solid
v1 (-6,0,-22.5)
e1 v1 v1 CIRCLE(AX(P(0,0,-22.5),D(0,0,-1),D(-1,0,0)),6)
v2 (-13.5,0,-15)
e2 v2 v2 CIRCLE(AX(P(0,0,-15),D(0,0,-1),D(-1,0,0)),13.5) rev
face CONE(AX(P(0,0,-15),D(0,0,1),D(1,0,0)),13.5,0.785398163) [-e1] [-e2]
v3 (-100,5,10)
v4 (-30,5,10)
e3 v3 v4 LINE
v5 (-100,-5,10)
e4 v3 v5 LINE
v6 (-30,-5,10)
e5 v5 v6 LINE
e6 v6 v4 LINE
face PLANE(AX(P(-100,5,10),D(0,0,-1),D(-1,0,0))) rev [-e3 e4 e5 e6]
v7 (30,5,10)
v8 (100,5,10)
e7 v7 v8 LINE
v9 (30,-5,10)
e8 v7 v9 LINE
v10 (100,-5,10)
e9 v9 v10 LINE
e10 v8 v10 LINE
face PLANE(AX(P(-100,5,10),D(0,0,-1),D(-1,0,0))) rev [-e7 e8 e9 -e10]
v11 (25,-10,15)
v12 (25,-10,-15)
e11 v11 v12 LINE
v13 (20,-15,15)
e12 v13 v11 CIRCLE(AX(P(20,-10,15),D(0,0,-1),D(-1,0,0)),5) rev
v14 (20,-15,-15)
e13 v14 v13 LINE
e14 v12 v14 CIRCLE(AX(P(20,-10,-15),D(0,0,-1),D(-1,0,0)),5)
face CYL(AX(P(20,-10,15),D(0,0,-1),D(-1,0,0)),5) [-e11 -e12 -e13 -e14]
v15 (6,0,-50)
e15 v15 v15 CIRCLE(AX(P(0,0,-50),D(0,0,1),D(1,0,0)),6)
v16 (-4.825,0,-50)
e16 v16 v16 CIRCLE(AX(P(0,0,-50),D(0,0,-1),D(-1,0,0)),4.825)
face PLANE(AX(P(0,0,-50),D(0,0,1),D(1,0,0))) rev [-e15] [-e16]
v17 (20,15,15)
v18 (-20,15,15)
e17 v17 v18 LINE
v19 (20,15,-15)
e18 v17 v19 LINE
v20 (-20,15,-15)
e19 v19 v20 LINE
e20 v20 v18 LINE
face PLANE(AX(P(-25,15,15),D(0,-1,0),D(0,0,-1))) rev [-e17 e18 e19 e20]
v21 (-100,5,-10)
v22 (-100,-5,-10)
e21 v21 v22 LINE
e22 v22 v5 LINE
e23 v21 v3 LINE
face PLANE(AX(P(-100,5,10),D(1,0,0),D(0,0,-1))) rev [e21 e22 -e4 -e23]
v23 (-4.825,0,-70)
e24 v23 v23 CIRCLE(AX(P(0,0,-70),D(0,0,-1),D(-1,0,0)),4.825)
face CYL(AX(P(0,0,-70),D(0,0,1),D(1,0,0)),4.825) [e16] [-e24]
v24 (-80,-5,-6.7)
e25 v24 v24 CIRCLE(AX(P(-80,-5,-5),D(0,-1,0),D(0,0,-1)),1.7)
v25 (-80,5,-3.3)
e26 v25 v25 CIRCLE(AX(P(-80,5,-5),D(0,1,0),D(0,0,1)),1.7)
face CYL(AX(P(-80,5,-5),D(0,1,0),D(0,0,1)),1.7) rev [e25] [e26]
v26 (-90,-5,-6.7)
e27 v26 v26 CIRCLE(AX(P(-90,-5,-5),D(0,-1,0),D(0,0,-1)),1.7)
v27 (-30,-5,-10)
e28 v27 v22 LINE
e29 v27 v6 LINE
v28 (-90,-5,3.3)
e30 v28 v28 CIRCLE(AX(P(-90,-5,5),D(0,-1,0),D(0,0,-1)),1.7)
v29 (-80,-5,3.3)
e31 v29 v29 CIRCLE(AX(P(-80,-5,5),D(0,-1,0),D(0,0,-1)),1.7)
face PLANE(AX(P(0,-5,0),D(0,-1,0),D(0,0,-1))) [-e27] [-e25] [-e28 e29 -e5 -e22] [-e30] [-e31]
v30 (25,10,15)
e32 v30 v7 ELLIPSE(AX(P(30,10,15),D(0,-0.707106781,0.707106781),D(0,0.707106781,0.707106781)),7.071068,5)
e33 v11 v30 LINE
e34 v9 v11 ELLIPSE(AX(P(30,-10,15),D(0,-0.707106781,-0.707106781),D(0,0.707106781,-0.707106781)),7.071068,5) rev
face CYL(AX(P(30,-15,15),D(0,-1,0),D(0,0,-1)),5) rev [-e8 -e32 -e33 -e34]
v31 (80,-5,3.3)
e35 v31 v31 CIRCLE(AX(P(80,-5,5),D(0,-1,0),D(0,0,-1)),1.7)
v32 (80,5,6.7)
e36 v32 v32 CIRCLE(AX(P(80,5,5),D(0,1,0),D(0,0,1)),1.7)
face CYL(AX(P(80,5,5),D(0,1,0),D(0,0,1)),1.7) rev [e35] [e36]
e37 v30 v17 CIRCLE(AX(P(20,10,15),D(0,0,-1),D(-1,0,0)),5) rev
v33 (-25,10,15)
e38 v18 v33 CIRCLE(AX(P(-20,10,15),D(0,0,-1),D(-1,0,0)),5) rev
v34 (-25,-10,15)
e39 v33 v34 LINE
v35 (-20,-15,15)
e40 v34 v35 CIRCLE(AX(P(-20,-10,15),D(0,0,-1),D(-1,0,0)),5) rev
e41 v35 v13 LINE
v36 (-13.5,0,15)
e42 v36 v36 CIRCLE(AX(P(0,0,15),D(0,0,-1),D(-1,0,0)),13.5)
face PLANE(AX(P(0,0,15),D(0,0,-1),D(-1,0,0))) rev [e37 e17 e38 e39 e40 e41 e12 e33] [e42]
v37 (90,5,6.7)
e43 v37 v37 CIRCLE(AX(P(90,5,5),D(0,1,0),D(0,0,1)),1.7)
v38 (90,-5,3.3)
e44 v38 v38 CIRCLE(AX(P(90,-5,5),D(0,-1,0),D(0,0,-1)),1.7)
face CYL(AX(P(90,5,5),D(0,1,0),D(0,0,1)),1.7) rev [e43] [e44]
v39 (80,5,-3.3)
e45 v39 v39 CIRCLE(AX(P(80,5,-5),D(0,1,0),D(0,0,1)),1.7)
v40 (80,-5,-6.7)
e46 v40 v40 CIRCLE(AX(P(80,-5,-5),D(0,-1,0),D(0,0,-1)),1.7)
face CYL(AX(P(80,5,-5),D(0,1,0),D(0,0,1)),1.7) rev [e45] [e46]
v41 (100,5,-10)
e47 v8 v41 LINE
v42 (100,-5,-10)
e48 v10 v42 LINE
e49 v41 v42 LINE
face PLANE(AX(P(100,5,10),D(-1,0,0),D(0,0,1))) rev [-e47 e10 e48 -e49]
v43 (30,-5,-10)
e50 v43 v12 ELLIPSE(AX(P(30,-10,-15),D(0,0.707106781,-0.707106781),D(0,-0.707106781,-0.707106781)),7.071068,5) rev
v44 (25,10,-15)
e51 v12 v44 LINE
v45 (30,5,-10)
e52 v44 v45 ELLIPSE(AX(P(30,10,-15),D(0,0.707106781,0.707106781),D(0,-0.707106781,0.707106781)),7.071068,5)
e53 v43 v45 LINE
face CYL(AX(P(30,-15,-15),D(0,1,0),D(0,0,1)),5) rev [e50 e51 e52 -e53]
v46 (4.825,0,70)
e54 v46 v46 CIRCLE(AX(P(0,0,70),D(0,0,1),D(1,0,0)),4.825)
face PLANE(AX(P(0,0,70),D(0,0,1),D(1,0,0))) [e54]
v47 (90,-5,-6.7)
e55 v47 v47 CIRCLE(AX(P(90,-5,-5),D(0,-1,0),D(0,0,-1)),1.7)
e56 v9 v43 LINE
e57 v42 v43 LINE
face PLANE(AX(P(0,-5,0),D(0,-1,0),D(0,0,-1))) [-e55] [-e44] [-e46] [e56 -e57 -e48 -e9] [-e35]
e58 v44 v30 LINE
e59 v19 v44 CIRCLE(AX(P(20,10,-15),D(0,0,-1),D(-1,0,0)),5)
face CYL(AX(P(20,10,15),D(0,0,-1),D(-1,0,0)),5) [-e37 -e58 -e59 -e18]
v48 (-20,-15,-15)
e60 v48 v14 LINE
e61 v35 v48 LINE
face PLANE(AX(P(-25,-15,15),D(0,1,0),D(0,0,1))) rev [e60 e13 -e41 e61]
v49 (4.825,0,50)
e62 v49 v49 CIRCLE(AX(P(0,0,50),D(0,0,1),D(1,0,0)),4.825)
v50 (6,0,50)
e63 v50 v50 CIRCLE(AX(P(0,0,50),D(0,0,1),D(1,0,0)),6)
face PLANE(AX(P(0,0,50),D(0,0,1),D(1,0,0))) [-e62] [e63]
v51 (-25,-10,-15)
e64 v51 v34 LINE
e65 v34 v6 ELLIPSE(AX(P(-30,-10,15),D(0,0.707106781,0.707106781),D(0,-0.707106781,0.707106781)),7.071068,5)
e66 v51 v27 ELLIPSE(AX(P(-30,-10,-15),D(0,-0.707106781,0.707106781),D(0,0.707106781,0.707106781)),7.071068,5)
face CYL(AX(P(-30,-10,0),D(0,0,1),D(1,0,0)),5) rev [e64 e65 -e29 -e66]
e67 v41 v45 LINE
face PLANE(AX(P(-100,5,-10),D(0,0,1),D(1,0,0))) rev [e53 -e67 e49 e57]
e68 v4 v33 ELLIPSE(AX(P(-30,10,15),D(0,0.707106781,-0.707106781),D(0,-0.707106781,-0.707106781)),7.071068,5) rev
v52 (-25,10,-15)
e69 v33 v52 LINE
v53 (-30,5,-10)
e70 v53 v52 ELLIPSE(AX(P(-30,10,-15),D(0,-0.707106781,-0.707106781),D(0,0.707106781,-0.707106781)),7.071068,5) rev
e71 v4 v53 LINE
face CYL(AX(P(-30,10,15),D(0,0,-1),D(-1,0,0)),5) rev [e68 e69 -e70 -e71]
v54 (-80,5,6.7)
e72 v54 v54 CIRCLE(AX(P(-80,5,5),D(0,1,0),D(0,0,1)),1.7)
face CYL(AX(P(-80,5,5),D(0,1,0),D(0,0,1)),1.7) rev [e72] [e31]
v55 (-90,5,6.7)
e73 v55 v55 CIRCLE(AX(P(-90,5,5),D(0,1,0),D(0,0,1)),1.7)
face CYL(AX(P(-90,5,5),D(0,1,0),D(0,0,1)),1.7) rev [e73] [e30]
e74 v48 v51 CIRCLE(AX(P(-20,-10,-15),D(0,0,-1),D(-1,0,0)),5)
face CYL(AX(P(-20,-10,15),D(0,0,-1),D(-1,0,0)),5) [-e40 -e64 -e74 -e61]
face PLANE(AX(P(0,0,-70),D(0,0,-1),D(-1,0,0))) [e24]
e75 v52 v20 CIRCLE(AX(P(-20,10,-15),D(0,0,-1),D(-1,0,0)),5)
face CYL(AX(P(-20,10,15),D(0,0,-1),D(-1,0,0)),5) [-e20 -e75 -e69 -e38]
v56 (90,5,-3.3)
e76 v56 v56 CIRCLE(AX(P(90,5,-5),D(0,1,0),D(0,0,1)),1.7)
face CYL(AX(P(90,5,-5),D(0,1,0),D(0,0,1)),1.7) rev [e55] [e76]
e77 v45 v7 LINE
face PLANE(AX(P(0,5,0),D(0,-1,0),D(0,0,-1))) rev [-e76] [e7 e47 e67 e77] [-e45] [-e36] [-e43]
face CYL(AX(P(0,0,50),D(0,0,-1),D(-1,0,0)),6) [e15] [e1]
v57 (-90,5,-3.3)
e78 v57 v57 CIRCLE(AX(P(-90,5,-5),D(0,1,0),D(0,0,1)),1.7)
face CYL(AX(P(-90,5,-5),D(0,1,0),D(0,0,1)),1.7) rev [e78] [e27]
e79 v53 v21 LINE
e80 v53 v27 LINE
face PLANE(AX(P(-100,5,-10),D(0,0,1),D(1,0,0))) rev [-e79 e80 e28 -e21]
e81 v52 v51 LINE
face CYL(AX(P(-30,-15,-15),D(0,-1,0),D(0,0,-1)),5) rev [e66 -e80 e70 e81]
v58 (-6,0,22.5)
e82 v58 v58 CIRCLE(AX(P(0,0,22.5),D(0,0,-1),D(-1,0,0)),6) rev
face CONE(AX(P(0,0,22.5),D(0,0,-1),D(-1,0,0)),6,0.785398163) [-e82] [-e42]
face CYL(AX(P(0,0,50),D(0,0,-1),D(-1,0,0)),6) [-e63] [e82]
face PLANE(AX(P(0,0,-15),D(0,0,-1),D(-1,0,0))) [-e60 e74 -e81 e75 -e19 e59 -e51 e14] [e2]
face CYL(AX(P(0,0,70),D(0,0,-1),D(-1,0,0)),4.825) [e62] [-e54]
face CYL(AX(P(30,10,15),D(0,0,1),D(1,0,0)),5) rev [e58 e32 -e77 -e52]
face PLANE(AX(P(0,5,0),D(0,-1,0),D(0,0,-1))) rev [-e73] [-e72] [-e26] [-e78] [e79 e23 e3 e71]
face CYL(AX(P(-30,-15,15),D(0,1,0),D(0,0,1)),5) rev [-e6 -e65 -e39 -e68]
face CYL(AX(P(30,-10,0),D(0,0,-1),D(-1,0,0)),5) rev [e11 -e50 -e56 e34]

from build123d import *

# Parameters (mm, degrees)
SKETCH1_W            = 200
SKETCH1_H            = 20
BOSS_EXTRUDE1_DEPTH  = 5
SKETCH2_W            = 50
SKETCH2_H            = 30
BOSS_EXTRUDE2_DEPTH  = 15
FILLET3_R            = 5
SKETCH3_R            = 6
BOSS_EXTRUDE3_DEPTH  = 50
CHAMFER1_SIZE        = 7.5
M3_CLEARANCE_HOLE1_D = 3.4
SKETCH19_R           = 4.825
BOSS_EXTRUDE4_DEPTH  = 20
BOSS_EXTRUDE5_START  = 20
SKETCH20_R           = 4.825
BOSS_EXTRUDE5_DEPTH  = 20


with BuildPart() as part:
    # Sketch1 → Boss-Extrude1 (new, symmetric)
    with BuildSketch(Plane(origin=(0, 0, 0), x_dir=(1, 0, 0), z_dir=(0, 1, 0))):
        Rectangle(SKETCH1_W, SKETCH1_H)
    extrude(amount=BOSS_EXTRUDE1_DEPTH, both=True)

    # Sketch2 → Boss-Extrude2 (add, symmetric)
    with BuildSketch(Plane.XY):
        Rectangle(SKETCH2_W, SKETCH2_H)
    extrude(amount=BOSS_EXTRUDE2_DEPTH, both=True)

    # Fillet3
    fillet3_edges = [part.edges().sort_by_distance(p)[0] for p in [
        (-25, -5, 0),
        (25, -5, 0),
        (25, -15, 0),
        (25, 0, 10),
        (25, 5, 0),
        (25, 0, -10),
        (-25, 15, 0),
        (-25, 0, -10),
        (-25, 5, 0),
        (-25, 0, 10),
        (25, 15, 0),
        (-25, -15, 0),
    ]]
    fillet(fillet3_edges, radius=FILLET3_R - 0.0001)  # a hair under: the kernel refuses the full size

    # Sketch3 → Boss-Extrude3 (add, symmetric)
    with BuildSketch(Plane.XY):
        with Locations(Location((0, 0, 0), (0, 0, 180))):
            Circle(SKETCH3_R)
    extrude(amount=BOSS_EXTRUDE3_DEPTH, both=True)

    # Chamfer1
    chamfer1_edges = [part.edges().sort_by_distance(p)[0] for p in [
        (6, 0, 15),
        (6, 0, -15),
    ]]
    chamfer(chamfer1_edges, length=CHAMFER1_SIZE)

    # M3 Clearance Hole1 (through all)
    with Locations(Plane(origin=(0, 5, 0), x_dir=(1, 0, 0), z_dir=(0, 1, 0))):
        with Locations((-90, 5), (-90, -5), (90, -5), (90, 5), (-80, 5), (-80, -5), (80, 5), (80, -5)):
            Hole(M3_CLEARANCE_HOLE1_D / 2)

    # Sketch19 → Boss-Extrude4 (add)
    with BuildSketch(Plane(origin=(0, 0, -50), x_dir=(-1, 0, 0), z_dir=(0, 0, -1))):
        Circle(SKETCH19_R)
    extrude(amount=BOSS_EXTRUDE4_DEPTH)

    # Sketch20 → Boss-Extrude5 (add)
    with BuildSketch(Plane.XY.offset(50).offset(BOSS_EXTRUDE5_START)):
        with Locations(Location((0, 0, 0), (0, 0, 180))):
            Circle(SKETCH20_R)
    extrude(amount=-BOSS_EXTRUDE5_DEPTH)


solid = part.part
